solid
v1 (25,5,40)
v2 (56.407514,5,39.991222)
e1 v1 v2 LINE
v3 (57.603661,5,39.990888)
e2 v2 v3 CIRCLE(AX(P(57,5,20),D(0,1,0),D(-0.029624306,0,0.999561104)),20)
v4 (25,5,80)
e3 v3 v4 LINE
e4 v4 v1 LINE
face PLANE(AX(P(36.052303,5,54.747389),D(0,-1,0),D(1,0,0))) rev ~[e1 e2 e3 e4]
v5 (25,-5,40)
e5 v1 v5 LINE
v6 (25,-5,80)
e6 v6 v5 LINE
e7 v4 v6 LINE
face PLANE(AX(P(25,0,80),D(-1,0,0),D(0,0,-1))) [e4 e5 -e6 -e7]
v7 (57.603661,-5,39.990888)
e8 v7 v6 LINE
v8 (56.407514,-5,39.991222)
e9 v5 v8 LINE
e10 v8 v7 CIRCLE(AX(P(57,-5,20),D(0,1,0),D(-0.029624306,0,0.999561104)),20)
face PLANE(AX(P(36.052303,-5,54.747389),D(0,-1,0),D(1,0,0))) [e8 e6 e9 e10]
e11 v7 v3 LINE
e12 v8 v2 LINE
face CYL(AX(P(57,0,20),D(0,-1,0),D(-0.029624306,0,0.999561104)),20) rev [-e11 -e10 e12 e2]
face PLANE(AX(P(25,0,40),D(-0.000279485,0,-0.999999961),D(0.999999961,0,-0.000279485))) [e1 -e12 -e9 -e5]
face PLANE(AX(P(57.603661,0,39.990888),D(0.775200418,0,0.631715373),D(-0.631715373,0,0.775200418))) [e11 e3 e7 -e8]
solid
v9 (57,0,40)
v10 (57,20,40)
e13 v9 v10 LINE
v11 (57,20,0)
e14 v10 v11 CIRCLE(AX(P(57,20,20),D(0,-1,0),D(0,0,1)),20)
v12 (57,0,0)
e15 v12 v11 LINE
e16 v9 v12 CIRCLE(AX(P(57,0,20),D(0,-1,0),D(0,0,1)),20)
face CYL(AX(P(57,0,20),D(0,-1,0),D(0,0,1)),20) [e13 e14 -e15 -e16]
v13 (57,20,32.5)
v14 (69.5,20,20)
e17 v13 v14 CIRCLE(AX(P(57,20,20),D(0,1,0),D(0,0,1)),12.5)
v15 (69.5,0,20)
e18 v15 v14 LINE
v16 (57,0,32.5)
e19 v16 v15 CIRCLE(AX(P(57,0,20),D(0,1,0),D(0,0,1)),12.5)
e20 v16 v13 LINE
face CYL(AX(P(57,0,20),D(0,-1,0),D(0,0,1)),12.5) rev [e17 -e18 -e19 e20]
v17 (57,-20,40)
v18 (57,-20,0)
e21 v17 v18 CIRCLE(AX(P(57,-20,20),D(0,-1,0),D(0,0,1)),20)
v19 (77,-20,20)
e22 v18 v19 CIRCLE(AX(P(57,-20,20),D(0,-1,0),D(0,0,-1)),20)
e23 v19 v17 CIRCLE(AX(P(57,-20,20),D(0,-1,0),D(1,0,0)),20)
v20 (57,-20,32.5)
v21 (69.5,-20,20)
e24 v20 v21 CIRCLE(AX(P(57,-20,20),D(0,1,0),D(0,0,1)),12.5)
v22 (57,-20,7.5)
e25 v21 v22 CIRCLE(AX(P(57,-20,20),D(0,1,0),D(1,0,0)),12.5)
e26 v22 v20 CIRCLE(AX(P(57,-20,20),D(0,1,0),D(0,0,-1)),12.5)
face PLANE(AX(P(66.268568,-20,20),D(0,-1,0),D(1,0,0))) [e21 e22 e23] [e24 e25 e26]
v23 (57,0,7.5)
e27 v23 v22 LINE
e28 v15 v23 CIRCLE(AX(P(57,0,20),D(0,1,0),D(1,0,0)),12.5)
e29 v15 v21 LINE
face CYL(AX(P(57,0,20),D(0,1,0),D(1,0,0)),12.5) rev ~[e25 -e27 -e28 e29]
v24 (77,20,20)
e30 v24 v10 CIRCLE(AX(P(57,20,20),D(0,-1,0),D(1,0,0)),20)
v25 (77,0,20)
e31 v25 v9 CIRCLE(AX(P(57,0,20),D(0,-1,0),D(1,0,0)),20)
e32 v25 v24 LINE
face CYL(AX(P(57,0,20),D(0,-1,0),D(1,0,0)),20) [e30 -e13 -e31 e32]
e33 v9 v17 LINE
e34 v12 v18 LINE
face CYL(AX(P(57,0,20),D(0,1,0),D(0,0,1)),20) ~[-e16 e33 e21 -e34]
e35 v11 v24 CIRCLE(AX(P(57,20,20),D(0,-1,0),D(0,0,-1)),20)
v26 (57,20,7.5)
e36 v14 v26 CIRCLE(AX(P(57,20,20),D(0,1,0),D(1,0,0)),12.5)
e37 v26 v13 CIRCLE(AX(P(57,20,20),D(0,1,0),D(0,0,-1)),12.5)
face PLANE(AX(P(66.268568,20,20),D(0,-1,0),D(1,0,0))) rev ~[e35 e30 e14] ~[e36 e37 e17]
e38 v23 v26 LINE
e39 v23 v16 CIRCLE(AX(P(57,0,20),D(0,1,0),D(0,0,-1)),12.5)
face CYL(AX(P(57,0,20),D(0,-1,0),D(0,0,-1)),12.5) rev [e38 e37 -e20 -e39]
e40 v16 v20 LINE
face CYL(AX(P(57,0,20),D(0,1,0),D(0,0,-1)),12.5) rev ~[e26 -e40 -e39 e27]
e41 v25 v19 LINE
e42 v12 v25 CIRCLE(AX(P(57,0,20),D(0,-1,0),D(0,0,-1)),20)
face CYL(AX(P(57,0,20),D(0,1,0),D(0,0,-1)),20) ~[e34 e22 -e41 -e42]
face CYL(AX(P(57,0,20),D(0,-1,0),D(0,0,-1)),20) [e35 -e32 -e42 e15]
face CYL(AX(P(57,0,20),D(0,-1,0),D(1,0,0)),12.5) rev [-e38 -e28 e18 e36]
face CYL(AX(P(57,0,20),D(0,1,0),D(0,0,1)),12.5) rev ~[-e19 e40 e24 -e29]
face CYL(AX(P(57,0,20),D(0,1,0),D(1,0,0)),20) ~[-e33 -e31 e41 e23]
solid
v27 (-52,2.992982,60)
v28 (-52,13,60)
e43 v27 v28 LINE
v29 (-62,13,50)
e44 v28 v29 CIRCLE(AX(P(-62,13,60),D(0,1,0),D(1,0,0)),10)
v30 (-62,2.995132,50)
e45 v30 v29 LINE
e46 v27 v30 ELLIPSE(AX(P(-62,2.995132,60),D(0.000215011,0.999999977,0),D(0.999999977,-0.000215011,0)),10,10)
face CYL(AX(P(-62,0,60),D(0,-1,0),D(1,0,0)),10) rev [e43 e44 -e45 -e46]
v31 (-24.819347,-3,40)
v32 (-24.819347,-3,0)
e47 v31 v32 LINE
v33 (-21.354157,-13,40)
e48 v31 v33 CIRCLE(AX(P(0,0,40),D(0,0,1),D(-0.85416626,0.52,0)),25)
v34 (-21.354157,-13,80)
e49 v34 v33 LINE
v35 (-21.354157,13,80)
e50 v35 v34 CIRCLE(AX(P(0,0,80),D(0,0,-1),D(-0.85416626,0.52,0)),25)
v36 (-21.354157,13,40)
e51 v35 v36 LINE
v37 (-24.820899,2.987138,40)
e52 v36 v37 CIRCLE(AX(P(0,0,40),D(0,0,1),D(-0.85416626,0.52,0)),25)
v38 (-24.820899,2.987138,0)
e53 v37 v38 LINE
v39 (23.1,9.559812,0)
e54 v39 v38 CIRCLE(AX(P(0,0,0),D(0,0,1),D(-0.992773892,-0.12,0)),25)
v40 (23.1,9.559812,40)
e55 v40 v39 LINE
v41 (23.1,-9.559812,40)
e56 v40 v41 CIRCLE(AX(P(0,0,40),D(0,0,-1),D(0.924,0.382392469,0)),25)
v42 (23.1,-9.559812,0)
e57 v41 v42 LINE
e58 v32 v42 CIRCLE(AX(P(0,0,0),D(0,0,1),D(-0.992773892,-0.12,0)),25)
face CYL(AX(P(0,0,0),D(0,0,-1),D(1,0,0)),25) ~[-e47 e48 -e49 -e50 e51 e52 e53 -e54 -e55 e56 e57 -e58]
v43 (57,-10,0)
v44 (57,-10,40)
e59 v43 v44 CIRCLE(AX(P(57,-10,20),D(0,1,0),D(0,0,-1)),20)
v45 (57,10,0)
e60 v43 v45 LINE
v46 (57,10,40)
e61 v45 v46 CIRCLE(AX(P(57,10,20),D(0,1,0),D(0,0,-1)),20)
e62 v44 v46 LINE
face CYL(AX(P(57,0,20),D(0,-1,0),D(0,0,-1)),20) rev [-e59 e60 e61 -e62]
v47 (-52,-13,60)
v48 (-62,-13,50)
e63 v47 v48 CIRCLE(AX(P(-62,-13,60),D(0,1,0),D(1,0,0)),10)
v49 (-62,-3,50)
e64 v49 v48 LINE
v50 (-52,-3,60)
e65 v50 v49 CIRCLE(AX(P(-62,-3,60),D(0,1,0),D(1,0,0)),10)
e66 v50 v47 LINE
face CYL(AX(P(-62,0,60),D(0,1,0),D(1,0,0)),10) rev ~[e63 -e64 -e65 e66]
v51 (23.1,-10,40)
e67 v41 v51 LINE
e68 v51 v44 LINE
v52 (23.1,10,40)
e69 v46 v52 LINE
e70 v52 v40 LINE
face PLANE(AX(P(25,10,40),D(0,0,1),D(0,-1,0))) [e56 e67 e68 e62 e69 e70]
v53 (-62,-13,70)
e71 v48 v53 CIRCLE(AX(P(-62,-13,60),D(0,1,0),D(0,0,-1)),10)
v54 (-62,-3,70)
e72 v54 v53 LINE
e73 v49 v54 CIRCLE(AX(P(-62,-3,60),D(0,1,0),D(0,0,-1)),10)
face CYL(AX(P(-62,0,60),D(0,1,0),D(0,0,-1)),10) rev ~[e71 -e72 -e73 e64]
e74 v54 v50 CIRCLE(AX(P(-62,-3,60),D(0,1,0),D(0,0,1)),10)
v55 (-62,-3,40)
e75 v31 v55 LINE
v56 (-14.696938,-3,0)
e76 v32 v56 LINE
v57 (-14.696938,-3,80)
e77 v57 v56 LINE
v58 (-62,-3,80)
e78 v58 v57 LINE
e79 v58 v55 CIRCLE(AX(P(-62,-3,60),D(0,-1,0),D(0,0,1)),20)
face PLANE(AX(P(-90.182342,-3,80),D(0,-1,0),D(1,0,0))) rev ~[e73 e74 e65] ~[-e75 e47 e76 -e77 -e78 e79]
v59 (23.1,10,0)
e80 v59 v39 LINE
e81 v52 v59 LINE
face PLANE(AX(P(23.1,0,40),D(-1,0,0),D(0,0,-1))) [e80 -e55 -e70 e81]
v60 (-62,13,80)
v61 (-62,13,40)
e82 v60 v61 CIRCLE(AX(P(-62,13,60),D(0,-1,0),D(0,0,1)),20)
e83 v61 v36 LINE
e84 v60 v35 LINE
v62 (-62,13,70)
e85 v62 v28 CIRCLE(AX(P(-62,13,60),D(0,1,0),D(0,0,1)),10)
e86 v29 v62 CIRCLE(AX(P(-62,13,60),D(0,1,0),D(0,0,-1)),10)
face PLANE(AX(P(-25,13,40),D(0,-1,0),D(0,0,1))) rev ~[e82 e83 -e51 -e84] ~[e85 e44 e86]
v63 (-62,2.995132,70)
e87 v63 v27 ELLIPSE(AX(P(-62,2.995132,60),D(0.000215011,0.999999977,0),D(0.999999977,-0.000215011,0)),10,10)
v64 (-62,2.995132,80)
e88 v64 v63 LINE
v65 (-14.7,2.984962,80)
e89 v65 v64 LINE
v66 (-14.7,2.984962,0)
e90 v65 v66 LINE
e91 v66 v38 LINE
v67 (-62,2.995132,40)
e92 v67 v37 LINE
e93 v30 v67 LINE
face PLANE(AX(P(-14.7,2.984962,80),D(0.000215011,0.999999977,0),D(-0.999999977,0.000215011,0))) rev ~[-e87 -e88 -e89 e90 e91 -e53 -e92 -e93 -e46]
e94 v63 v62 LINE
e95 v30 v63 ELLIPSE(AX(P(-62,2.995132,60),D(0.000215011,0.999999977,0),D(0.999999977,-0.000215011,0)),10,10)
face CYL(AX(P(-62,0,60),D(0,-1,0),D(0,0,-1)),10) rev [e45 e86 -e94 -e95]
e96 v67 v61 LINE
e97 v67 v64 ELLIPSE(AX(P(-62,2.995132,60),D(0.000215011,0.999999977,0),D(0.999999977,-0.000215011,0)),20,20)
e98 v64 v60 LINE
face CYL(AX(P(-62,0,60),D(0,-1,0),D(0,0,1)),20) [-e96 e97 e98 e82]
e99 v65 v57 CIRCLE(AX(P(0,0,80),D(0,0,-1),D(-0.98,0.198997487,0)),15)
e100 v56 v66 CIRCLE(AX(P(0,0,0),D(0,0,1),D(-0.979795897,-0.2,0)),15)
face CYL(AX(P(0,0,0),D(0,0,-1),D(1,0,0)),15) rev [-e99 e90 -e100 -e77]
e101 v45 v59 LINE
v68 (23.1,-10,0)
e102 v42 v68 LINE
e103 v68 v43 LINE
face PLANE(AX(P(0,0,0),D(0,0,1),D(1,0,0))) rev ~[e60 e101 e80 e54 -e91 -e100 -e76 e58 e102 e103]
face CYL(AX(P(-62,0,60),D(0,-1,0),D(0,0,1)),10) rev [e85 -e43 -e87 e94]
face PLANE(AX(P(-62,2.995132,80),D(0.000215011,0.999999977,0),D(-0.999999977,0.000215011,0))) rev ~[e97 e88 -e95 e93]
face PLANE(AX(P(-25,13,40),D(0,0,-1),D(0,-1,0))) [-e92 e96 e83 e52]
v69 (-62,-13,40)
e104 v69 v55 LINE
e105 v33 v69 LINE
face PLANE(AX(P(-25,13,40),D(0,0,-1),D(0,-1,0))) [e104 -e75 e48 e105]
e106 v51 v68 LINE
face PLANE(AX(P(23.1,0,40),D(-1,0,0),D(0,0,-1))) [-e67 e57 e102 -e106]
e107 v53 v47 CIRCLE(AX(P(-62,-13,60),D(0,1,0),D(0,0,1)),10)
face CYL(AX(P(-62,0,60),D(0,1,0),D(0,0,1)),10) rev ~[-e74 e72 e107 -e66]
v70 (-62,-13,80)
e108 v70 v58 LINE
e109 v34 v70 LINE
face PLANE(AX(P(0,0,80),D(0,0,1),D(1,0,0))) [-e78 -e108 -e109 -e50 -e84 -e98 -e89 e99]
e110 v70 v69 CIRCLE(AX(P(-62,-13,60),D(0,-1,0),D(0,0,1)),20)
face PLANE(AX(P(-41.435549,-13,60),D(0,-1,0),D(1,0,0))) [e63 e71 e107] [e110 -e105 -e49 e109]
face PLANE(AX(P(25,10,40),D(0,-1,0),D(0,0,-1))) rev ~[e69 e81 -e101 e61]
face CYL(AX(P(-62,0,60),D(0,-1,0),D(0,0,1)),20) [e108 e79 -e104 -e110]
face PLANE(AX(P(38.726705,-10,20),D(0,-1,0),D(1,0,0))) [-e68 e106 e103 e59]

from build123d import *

# Parameters (mm, degrees)
F0_R           = 25
F0_R_2         = 15
F1_DEPTH       = 80
F3_DEPTH       = 13
F3_DEPTH_BACK  = 13
F4_DEPTH       = 4.5
F5_W           = 28.1823416352
F5_H           = 3
F6_DEPTH       = 99.3
F8_DEPTH       = 10
F8_DEPTH_BACK  = 10
F9_DEPTH       = 20
F9_DEPTH_BACK  = 20
F10_DEPTH      = 1.9
F12_DEPTH      = 5
F12_DEPTH_BACK = 5


# Not quite as in the source:
# - ends of sketch curves that miss each other by under 0.0002 mm in the source are joined


with BuildPart() as f1:
    # F0 (on Top) → F1 (new body)
    with BuildSketch(Plane.XY):
        Circle(F0_R)
        Circle(F0_R_2, mode=Mode.SUBTRACT)
    extrude(amount=F1_DEPTH)



with BuildPart() as f3:
    # F2 (on Front) → F3 (new body, two sides)
    with BuildSketch(Plane.XZ) as f3_sk:
        with BuildLine():
            Line((-62, 40), (-25, 40))
            Line((-25, 40), (-25, 80))
            Line((-25, 80), (-62, 80))
            ThreePointArc((-62, 80), (-47.8578643763, 74.1421356237), (-42, 60))
            ThreePointArc((-42, 60), (-47.8578643763, 45.8578643763), (-62, 40))
        make_face()
        with BuildLine():
            ThreePointArc((-62, 80), (-82, 60), (-62, 40))
            Line((-62, 40), (-62, 50))
            ThreePointArc((-62, 50), (-72, 60), (-62, 70))
            Line((-62, 70), (-62, 80))
        make_face()
        with BuildLine():
            Line((-62, 50), (-62, 40))
            ThreePointArc((-62, 40), (-47.8578643763, 45.8578643763), (-42, 60))
            ThreePointArc((-42, 60), (-47.8578643763, 74.1421356237), (-62, 80))
            Line((-62, 80), (-62, 70))
            ThreePointArc((-62, 70), (-54.9289321881, 67.0710678119), (-52, 60))
            ThreePointArc((-52, 60), (-54.9289321881, 52.9289321881), (-62, 50))
        make_face()
    extrude(amount=F3_DEPTH)
    extrude(f3_sk.sketch, amount=-F3_DEPTH_BACK)


with BuildPart() as f1_1:
    add(f1.part)
    # F4 (add): a face of the model
    f4_faces = [f3.part.faces().sort_by_distance(p)[0] for p in [
        (-25, 0, 60),
    ]]

    add(f3.part)  # F4 merges F3
    extrude(f4_faces, amount=F4_DEPTH)

    # F5 (on face) → F6 (cut)
    with BuildSketch(Plane.XY.offset(80)):
        Polygon((-90.1823416352, 0), (-62, 0), (-62, 2.9951323172), (-90.1823415071, 3.0011918221), align=None)
        with Locations((-76.0911708176, -1.5)):
            Rectangle(F5_W, F5_H)
        with BuildLine():
            Line((-62, 0), (-15, 0))
            ThreePointArc((-15, 0), (-14.9248115566, 1.5), (-14.7, 2.9849623113))
            Line((-14.7, 2.9849623113), (-62, 2.9951323172))
            Line((-62, 2.9951323172), (-62, 0))
        make_face()
        with BuildLine():
            ThreePointArc((-14.6969384567, -3), (-14.9240422951, -1.5076344301), (-15, 0))
            Line((-15, 0), (-62, 0))
            Line((-62, 0), (-62, -3))
            Line((-62, -3), (-14.6969384567, -3))
        make_face()
    extrude(amount=-F6_DEPTH, mode=Mode.SUBTRACT)



with BuildPart() as f8:
    # F7 (on Front) → F8 (new body, two sides)
    with BuildSketch(Plane.XZ) as f8_sk:
        with BuildLine():
            Line((57, 40), (25, 40))
            Line((25, 40), (25, 0))
            Line((25, 0), (57, 0))
            ThreePointArc((57, 0), (37, 20), (57, 40))
        make_face()
    extrude(amount=F8_DEPTH)
    extrude(f8_sk.sketch, amount=-F8_DEPTH_BACK)


with BuildPart() as f9:
    # F7 (on Front) → F9 (new body, two sides)
    with BuildSketch(Plane.XZ) as f9_sk:
        with BuildLine():
            ThreePointArc((77, 20), (71.1421356237, 34.1421356237), (57, 40))
            Line((57, 40), (57, 32.5))
            ThreePointArc((57, 32.5), (65.8388347648, 28.8388347648), (69.5, 20))
            ThreePointArc((69.5, 20), (65.8388347648, 11.1611652352), (57, 7.5))
            Line((57, 7.5), (57, 0))
            ThreePointArc((57, 0), (71.1421356237, 5.8578643763), (77, 20))
        make_face()
        with BuildLine():
            Line((57, 32.5), (57, 40))
            ThreePointArc((57, 40), (37, 20), (57, 0))
            Line((57, 0), (57, 7.5))
            ThreePointArc((57, 7.5), (44.5, 20), (57, 32.5))
        make_face()
    extrude(amount=F9_DEPTH)
    extrude(f9_sk.sketch, amount=-F9_DEPTH_BACK)


with BuildPart() as f1_2:
    add(f1_1.part)
    # F10 (add): a face of the model
    f10_faces = [f8.part.faces().sort_by_distance(p)[0] for p in [
        (25, 0, 20),
    ]]

    add(f8.part)  # F10 merges F8
    extrude(f10_faces, amount=F10_DEPTH)


with BuildPart() as f12:
    # F11 (on Front) → F12 (new body, two sides)
    with BuildSketch(Plane.XZ) as f12_sk:
        with BuildLine():
            Line((57.6036605042, 39.9908877741), (25, 80))
            Line((25, 80), (25, 40))
            Line((25, 40), (56.4075138858, 39.9912220788))
            ThreePointArc((56.4075138858, 39.9912220788), (57.0055896948, 39.9999992189), (57.6036605042, 39.9908877741))
        make_face()
    extrude(amount=F12_DEPTH)
    extrude(f12_sk.sketch, amount=-F12_DEPTH_BACK)


solid = Compound([f9.part, f1_2.part, f12.part])
